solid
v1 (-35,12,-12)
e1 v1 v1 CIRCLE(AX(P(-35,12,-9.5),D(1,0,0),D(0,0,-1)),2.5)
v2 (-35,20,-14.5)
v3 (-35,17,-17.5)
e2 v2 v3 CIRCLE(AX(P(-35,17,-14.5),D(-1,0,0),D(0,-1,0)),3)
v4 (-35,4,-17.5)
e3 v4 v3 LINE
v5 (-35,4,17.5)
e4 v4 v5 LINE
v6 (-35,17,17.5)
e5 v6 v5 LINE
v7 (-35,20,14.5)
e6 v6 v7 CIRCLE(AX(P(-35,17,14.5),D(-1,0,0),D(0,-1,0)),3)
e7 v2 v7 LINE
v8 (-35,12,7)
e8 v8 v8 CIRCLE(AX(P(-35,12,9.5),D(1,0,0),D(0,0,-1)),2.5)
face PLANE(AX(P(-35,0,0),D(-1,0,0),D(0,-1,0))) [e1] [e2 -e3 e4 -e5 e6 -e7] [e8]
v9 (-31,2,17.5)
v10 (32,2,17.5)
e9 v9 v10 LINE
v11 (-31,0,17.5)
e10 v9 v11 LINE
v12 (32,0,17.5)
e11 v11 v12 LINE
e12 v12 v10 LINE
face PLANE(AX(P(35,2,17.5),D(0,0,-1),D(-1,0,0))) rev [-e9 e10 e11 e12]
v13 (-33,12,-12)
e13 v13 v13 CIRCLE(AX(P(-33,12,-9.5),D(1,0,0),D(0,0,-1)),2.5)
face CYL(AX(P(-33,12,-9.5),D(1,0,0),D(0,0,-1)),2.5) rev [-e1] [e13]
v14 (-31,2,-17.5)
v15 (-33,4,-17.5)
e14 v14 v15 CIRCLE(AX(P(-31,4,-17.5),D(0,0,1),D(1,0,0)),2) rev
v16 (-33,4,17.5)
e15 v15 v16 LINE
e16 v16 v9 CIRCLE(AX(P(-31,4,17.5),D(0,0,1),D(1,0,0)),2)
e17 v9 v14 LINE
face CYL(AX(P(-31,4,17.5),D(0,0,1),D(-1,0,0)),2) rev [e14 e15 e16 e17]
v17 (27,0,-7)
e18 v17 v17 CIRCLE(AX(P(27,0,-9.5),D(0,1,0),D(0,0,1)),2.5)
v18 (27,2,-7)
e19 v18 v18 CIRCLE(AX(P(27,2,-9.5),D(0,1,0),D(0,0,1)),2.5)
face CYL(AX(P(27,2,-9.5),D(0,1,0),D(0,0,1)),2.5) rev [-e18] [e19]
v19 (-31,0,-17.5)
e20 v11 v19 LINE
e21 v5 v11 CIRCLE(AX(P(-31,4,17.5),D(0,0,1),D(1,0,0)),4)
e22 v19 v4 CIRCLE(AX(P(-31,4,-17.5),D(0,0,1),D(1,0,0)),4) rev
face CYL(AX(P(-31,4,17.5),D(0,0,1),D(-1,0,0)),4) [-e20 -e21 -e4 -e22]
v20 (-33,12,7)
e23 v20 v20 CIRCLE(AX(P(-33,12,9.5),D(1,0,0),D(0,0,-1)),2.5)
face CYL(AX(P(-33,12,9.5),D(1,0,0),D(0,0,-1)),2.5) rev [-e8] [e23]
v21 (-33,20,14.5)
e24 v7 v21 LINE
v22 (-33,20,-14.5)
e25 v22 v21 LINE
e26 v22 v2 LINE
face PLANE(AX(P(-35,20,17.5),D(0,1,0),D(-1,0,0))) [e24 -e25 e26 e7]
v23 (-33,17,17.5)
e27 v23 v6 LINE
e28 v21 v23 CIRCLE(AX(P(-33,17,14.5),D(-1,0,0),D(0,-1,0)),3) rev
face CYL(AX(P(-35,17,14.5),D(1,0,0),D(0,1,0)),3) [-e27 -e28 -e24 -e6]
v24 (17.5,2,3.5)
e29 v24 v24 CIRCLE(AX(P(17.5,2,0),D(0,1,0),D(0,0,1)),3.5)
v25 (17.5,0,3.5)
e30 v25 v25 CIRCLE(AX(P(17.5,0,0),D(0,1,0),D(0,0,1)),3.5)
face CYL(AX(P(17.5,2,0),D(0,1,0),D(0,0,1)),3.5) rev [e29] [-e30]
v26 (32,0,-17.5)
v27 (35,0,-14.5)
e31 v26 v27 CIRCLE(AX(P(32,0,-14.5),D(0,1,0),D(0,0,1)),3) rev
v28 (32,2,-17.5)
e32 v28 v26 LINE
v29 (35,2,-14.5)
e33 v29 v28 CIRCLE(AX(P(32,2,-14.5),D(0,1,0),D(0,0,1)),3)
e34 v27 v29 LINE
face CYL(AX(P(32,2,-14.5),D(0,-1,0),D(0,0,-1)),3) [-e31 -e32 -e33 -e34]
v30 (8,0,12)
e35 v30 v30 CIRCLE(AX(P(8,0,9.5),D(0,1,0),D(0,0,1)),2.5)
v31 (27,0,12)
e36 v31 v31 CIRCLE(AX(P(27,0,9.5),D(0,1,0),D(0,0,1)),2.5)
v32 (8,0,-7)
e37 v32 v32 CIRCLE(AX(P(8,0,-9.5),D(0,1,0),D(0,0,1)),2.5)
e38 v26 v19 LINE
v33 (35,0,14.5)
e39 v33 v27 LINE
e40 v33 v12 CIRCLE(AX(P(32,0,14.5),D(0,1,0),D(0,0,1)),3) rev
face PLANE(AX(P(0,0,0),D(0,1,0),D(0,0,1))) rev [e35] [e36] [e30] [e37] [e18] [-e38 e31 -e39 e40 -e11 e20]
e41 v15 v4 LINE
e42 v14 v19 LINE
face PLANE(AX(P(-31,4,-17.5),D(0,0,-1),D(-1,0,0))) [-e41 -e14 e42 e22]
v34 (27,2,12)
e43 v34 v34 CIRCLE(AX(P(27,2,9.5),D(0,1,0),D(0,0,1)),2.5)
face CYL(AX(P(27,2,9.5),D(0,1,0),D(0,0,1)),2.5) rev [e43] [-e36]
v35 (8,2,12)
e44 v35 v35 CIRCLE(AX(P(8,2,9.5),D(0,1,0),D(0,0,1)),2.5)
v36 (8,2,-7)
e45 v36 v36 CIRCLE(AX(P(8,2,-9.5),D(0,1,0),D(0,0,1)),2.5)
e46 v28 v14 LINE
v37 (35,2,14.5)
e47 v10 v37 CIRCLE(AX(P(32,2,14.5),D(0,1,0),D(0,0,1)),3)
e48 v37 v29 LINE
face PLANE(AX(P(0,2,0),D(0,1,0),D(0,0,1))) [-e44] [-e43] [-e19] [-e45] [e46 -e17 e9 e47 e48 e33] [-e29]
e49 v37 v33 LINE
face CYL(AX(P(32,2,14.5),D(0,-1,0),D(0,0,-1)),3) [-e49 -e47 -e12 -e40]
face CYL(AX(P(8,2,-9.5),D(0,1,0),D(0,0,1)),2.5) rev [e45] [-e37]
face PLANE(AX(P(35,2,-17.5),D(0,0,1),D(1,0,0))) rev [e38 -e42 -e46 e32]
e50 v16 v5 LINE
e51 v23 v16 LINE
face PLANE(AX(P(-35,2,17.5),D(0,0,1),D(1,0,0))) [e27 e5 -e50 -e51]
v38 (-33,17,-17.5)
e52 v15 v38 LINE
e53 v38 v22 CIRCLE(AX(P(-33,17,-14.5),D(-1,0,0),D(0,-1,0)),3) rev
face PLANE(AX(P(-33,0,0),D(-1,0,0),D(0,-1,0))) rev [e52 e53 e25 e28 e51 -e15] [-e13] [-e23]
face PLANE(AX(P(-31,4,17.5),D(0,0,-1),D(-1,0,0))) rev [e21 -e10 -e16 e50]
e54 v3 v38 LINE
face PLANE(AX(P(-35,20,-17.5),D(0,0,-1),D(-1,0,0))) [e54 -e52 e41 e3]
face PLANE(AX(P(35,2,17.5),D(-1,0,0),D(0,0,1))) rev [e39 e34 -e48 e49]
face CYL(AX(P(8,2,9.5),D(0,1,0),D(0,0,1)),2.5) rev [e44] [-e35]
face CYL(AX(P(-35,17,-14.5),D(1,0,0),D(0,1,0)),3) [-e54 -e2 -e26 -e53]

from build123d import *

# Parameters (mm, degrees)
SKETCH1_W                    = 70
SKETCH1_H                    = 35
BASE_FLANGE1_DEPTH           = 2
EDGE_FLANGE1_STRIP_W         = 12
EDGE_FLANGE1_STRIP_H         = 2
EDGE_FLANGE1_STRIP_CUT_DEPTH = 35
EDGE_FLANGE1_DEPTH           = 35
F_5_0MM_DOWEL_HOLE1_D        = 5
F_5_0MM_DOWEL_HOLE2_D        = 7
F_5_0MM_DOWEL_HOLE3_D        = 5
FILLET1_R                    = 3


# Sheet-metal steps are written as plain solids
with BuildPart() as part:
    # Sketch1 → Base-Flange1 (new body)
    with BuildSketch(Plane(origin=(0, 0, 0), x_dir=(1, 0, 0), z_dir=(0, 1, 0))):
        Rectangle(SKETCH1_W, SKETCH1_H)
    extrude(amount=BASE_FLANGE1_DEPTH)

    # Edge-Flange1 strip (across the edge) → Edge-Flange1 strip cut (cut)
    with BuildSketch(Plane(origin=(-35, 2, -17.5), x_dir=(1, 0, 0), z_dir=(0, 0, 1))):
        with Locations((-2, -1)):
            Rectangle(EDGE_FLANGE1_STRIP_W, EDGE_FLANGE1_STRIP_H)
    extrude(amount=EDGE_FLANGE1_STRIP_CUT_DEPTH, mode=Mode.SUBTRACT)

    # Edge-Flange1 section (across the edge) → Edge-Flange1 (add)
    with BuildSketch(Plane(origin=(-35, 2, -17.5), x_dir=(1, 0, 0), z_dir=(0, 0, 1))):
        with BuildLine():
            Line((0, 2), (0, 18))
            Line((0, 18), (2, 18))
            Line((2, 18), (2, 2))
            ThreePointArc((2, 2), (2.585786438, 0.585786438), (4, 0))
            Line((4, 0), (4, -2))
            ThreePointArc((4, -2), (1.171572875, -0.828427125), (0, 2))
        make_face()
    extrude(amount=EDGE_FLANGE1_DEPTH)

    # Ø5.0mm Dowel Hole1 (through all)
    with Locations(Plane(origin=(0, 2, 0), x_dir=(1, 0, 0), z_dir=(0, 1, 0))):
        with Locations((8, 9.5), (27, 9.5), (27, -9.5), (8, -9.5)):
            Hole(F_5_0MM_DOWEL_HOLE1_D / 2)

    # Ø5.0mm Dowel Hole2 (through all)
    with Locations(Plane(origin=(0, 2, 0), x_dir=(1, 0, 0), z_dir=(0, 1, 0))):
        with Locations((17.5, 0)):
            Hole(F_5_0MM_DOWEL_HOLE2_D / 2)

    # Ø5.0mm Dowel Hole3 (through all)
    with Locations(Plane(origin=(-33, 0, 0), x_dir=(0, 0, -1), z_dir=(1, 0, 0))):
        with Locations((-9.5, 12), (9.5, 12)):
            Hole(F_5_0MM_DOWEL_HOLE3_D / 2)

    # Fillet1
    fillet1_edges = [part.edges().sort_by_distance(p)[0] for p in [
        (-34, 20, -17.5),
        (-34, 20, 17.5),
        (35, 1, -17.5),
        (35, 1, 17.5),
    ]]
    fillet(fillet1_edges, radius=FILLET1_R)


solid = part.part
